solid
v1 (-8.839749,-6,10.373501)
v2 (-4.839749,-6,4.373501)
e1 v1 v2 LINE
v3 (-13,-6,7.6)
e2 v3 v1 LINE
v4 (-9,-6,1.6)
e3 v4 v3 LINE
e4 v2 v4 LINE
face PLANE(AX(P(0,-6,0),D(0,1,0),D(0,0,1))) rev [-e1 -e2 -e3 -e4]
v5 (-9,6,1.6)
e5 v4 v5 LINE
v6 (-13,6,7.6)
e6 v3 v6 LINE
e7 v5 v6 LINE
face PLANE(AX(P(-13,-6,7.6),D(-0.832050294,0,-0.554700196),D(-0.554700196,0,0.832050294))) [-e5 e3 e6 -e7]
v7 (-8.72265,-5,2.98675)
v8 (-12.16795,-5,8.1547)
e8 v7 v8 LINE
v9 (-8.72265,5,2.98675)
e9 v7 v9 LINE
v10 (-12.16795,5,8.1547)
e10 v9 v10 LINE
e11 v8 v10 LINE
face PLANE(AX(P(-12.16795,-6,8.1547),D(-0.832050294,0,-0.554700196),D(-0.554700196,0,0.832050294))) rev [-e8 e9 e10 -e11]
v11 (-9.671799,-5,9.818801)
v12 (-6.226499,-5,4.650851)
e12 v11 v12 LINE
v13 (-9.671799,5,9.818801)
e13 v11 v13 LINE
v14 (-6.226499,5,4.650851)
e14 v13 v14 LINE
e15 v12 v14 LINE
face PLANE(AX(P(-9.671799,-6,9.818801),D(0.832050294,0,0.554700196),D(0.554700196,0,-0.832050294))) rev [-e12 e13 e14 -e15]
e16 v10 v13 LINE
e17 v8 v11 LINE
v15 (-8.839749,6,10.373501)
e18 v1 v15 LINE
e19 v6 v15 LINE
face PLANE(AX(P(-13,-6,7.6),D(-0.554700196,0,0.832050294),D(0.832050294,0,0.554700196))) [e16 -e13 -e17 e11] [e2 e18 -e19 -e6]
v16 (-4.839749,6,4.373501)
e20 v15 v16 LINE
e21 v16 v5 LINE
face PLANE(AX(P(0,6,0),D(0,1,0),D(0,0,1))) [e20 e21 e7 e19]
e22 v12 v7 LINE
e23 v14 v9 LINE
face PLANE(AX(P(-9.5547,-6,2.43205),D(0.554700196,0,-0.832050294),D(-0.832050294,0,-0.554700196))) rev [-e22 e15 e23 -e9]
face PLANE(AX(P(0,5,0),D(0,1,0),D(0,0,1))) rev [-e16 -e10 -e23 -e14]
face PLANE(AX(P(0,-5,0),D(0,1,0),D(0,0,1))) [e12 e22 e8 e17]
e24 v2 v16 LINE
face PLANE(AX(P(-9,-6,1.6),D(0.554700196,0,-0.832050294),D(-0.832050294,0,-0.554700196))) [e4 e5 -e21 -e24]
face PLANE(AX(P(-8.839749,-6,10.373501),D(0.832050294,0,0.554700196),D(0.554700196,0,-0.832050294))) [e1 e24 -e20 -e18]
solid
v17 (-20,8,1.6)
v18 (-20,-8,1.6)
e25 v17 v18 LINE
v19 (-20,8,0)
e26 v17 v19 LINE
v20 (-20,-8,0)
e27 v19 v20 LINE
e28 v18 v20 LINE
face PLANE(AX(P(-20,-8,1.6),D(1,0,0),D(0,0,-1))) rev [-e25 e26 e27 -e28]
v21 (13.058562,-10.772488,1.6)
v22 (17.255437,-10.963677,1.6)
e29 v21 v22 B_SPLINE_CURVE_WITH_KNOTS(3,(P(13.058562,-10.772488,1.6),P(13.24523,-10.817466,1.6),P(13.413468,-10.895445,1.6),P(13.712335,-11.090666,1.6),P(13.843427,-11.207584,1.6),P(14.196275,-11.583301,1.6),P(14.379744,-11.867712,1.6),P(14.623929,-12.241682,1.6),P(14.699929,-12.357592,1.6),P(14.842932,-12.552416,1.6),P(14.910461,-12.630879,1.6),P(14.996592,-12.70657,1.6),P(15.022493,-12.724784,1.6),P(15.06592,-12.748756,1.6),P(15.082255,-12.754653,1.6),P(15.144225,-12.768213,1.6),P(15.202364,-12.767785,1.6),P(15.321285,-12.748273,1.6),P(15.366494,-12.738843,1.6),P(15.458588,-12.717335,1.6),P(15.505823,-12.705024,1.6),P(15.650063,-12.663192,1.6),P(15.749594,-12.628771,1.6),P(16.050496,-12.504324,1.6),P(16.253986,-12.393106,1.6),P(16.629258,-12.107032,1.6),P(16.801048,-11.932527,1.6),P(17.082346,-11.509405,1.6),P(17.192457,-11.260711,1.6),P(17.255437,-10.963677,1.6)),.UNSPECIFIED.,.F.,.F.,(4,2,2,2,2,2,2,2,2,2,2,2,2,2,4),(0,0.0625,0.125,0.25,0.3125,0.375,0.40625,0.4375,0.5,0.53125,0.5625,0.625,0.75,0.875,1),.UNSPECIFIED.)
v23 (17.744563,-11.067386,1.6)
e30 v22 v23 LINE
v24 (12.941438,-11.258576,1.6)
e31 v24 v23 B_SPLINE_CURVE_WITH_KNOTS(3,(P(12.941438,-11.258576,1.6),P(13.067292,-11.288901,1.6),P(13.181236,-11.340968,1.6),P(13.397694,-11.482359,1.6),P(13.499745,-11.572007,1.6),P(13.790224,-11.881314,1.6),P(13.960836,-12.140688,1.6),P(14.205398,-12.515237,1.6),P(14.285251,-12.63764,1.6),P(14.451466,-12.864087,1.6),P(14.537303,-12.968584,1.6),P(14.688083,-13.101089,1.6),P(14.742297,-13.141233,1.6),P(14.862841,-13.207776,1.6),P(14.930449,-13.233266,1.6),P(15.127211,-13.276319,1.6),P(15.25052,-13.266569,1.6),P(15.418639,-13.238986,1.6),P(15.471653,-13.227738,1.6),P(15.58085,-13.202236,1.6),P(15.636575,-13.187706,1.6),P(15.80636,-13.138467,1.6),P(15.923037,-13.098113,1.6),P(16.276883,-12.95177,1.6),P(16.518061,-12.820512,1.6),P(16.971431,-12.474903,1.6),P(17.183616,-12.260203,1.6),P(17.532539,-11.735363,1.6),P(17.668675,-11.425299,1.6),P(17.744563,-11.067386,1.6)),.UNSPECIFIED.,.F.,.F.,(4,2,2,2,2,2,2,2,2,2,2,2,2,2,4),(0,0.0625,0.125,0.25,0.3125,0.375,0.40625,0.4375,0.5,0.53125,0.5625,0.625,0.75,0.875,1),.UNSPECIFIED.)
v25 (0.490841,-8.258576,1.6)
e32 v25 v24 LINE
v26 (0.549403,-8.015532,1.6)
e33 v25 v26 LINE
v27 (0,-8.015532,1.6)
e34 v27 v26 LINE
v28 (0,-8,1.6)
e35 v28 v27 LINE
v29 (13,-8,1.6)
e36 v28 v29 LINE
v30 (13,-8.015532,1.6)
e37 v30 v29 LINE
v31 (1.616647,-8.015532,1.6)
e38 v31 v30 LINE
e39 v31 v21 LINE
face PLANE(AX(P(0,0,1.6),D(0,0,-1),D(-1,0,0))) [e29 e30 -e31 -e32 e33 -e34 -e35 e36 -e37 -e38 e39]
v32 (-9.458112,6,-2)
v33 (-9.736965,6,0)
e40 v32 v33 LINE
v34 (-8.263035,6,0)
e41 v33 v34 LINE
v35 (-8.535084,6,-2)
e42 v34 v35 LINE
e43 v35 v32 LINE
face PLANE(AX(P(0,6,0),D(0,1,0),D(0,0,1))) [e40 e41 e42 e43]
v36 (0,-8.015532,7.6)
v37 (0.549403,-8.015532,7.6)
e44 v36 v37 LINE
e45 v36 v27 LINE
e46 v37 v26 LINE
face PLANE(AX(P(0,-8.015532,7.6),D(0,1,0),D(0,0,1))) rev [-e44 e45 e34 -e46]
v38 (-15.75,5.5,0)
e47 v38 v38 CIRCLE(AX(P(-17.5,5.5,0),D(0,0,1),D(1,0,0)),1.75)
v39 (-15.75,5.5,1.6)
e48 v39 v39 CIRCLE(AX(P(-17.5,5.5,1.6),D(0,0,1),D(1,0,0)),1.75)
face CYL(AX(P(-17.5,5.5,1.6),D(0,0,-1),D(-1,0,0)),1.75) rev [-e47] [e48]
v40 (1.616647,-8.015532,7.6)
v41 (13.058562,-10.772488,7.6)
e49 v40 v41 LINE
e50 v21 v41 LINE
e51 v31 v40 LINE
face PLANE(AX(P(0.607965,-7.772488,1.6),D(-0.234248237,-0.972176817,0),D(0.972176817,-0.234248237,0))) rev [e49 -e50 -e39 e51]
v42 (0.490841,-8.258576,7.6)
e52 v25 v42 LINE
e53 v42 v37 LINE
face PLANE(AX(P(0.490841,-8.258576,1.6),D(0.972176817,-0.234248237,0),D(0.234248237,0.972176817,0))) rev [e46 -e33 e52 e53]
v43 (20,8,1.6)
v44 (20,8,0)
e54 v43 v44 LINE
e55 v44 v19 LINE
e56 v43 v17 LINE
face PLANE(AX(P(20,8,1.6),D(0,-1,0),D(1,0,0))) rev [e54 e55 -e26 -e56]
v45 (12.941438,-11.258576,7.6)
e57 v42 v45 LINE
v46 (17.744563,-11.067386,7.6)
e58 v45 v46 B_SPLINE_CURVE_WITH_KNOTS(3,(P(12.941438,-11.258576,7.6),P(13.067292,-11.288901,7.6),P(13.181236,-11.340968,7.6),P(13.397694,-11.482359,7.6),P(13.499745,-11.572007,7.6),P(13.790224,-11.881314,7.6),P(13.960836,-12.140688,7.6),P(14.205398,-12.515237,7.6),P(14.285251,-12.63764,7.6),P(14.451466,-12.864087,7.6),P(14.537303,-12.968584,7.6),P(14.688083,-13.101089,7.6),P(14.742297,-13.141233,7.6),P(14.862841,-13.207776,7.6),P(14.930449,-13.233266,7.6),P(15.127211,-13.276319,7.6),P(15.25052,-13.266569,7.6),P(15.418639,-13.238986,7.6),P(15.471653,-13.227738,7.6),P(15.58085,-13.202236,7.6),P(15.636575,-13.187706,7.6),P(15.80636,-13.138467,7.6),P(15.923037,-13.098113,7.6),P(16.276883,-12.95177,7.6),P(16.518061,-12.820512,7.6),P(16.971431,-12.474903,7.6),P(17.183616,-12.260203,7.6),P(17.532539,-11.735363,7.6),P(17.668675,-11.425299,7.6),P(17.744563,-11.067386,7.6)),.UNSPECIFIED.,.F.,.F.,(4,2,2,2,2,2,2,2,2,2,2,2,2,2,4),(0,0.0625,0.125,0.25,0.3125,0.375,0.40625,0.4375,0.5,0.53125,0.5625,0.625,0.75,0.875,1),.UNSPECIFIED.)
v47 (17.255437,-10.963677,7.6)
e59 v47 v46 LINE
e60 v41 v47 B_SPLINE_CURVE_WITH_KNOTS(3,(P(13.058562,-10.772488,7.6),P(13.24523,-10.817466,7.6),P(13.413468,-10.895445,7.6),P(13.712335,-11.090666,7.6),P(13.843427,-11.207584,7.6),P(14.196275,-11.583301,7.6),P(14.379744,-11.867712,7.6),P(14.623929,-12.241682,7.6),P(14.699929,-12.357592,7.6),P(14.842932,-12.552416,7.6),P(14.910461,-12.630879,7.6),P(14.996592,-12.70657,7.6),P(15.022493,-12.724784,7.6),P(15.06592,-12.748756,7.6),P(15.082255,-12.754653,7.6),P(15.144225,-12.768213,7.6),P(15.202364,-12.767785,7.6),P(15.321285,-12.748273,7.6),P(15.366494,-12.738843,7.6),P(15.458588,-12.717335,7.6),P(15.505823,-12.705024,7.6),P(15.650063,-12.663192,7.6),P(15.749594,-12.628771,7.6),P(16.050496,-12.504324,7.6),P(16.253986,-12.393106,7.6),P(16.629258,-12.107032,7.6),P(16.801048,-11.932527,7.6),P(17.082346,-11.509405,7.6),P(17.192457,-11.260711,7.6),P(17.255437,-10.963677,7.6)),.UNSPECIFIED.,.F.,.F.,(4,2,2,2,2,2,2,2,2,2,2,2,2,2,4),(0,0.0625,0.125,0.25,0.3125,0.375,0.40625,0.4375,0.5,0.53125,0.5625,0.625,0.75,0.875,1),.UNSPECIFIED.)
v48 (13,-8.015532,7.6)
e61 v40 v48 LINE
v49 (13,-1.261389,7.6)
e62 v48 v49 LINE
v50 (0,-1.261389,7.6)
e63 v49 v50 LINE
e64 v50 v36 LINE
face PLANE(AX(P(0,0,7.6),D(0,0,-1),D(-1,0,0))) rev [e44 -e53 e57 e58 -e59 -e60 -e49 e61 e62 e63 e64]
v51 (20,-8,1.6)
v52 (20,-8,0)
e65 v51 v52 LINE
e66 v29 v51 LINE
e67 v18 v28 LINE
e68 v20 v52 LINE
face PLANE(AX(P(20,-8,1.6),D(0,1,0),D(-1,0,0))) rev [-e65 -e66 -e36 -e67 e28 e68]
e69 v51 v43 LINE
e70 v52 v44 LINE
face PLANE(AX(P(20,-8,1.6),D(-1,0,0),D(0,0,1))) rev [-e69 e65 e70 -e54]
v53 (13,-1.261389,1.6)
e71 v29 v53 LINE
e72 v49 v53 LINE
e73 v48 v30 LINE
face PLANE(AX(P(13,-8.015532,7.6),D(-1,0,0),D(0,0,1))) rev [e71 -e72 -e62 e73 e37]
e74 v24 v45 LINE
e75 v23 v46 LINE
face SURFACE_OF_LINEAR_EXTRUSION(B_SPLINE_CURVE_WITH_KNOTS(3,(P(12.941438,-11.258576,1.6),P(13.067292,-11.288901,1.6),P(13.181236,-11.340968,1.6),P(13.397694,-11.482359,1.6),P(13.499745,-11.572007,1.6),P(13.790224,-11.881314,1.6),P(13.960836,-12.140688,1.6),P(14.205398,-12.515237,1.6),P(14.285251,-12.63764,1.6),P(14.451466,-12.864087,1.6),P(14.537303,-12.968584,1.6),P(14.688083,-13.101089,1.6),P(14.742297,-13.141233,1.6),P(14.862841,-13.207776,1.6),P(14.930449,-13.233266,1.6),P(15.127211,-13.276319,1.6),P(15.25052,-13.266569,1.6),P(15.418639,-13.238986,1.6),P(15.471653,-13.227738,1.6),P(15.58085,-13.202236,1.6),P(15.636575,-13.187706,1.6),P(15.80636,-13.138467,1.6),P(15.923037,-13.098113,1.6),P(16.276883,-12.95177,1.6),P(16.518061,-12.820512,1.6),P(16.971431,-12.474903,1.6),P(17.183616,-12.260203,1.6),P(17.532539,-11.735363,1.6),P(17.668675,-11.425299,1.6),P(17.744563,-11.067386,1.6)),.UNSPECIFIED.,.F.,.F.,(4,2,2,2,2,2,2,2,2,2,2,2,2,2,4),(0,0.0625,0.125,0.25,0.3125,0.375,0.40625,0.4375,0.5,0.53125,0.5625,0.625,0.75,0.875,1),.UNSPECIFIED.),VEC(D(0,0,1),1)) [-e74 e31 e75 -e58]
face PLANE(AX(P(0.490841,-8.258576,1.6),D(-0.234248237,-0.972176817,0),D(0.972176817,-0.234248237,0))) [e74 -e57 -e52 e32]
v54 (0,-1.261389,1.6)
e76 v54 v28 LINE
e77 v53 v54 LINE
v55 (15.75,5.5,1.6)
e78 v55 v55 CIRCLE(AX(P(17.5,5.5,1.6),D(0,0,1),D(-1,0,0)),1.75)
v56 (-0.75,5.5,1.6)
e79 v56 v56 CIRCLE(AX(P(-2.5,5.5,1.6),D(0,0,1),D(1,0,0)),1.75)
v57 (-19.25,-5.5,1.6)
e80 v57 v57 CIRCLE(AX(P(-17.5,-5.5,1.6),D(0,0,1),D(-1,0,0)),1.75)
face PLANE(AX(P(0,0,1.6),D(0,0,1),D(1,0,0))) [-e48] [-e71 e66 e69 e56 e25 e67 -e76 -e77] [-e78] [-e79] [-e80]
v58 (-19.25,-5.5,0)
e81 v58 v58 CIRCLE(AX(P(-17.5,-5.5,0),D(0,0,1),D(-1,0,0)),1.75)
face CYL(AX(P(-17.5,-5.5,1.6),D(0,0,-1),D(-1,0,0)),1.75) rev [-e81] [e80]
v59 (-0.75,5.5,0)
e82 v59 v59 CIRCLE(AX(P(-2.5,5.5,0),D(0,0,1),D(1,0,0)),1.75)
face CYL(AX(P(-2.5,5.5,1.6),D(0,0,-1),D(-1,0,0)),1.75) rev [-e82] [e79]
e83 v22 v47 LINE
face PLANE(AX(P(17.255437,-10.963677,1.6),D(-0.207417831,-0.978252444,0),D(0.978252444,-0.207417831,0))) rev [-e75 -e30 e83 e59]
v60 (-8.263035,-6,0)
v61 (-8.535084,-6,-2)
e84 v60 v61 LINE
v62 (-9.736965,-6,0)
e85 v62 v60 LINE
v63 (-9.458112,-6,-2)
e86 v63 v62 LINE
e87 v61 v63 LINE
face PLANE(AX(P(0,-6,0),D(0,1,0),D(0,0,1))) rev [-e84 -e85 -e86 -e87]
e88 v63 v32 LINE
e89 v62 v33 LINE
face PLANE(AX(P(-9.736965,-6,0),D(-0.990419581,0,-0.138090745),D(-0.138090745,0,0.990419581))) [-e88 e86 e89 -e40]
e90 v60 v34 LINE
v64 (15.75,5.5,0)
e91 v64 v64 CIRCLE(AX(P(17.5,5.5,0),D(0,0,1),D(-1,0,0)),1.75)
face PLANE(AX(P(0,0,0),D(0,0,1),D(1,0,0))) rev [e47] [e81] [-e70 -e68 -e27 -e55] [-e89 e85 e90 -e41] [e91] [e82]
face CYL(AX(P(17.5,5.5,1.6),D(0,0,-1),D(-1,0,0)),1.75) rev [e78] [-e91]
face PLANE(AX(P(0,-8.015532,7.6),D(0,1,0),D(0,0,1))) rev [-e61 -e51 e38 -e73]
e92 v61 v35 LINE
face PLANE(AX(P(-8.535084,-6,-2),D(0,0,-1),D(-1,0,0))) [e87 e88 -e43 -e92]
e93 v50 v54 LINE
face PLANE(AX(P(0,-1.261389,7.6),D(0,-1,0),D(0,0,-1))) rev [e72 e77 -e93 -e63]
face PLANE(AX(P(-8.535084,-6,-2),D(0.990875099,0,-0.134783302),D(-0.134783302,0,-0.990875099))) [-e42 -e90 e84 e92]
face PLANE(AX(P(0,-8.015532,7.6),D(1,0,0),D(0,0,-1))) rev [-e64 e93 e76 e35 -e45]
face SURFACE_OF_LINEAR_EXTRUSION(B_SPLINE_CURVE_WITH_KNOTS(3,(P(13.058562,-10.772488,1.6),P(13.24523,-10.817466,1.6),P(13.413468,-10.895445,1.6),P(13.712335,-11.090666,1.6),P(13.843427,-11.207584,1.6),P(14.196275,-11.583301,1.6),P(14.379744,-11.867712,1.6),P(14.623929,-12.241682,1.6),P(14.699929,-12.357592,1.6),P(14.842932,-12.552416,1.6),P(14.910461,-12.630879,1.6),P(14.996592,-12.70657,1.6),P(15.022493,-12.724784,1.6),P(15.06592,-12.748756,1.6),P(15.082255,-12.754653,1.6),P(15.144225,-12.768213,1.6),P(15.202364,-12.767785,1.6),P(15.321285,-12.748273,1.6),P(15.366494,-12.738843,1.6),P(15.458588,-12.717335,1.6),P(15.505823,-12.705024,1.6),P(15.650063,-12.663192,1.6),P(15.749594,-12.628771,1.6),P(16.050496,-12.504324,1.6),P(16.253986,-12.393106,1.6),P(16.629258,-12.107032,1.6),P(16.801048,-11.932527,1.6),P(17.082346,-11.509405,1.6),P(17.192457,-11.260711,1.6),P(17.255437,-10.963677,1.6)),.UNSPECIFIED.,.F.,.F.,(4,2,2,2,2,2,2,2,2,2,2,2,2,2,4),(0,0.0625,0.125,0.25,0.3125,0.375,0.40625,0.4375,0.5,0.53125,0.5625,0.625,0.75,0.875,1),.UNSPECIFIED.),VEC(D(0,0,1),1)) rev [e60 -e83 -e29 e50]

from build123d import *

# Parameters (mm, degrees)
SKETCH1_W           = 40
SKETCH1_H           = 16
SKETCH1_R           = 1.75
EXTRUDE1_DEPTH      = 1.6
SKETCH2_W           = 13
SKETCH2_H           = 6.754142386
EXTRUDE2_DEPTH      = 6
EXTRUDE_THIN1_START = -6
EXTRUDE_THIN1_DEPTH = 6
EXTRUDE3_DEPTH      = 6
EXTRUDE3_DEPTH_BACK = 6
SHELL1_T            = -1
EXTRUDE4_DEPTH      = 6
EXTRUDE4_DEPTH_BACK = 6


# Read off the part's stored shape, not the designer's step: Extrude-Thin1
with BuildPart() as part:
    # Sketch1 → Extrude1 (new body)
    with BuildSketch(Plane.XY):
        Rectangle(SKETCH1_W, SKETCH1_H)
        with Locations((-17.5, 5.5)):
            Circle(SKETCH1_R, mode=Mode.SUBTRACT)
        with Locations(Location((17.5, 5.5, 0), (0, 0, 180))):
            Circle(SKETCH1_R, mode=Mode.SUBTRACT)
        with Locations(Location((-17.5, -5.5, 0), (0, 0, 180))):
            Circle(SKETCH1_R, mode=Mode.SUBTRACT)
        with Locations((-2.5, 5.5)):
            Circle(SKETCH1_R, mode=Mode.SUBTRACT)
    extrude(amount=EXTRUDE1_DEPTH)

    # Sketch2 → Extrude2 (add)
    with BuildSketch(Plane.XY.offset(1.6)):
        with Locations((6.5, -4.638460583)):
            Rectangle(SKETCH2_W, SKETCH2_H)
    extrude(amount=EXTRUDE2_DEPTH)

    # Extrude-Thin1 outline → Extrude-Thin1 (add)
    with BuildSketch(Plane.XY.offset(7.6).offset(EXTRUDE_THIN1_START)):
        with BuildLine():
            Line((0.490840728, -8.25857598), (12.941437941, -11.25857598))
            add(Edge.make_bspline(
                [(12.941437941, -11.25857598), (13.067291507, -11.288900686), (13.181236211, -11.340967983), (13.397694142, -11.482359101), (13.49974484, -11.572007401), (13.790224047, -11.88131409), (13.96083617, -12.140688181), (14.20539816, -12.515236753), (14.285250733, -12.637639815), (14.451465801, -12.86408748), (14.537302747, -12.968584339), (14.688083246, -13.101089197), (14.742296743, -13.141233409), (14.862841146, -13.207776058), (14.930449466, -13.233266141), (15.127211291, -13.276318978), (15.250520499, -13.266569443), (15.418638539, -13.238985632), (15.471653276, -13.227738224), (15.58084969, -13.202236421), (15.636575352, -13.187706268), (15.806360125, -13.138466747), (15.923036621, -13.098113207), (16.276883006, -12.95177033), (16.518060705, -12.820511607), (16.971431108, -12.474902809), (17.183616041, -12.260202761), (17.532538565, -11.735362691), (17.66867522, -11.425299122), (17.744563111, -11.067386233)],
                knots=[0, 0, 0, 0, 0.0625, 0.0625, 0.125, 0.125, 0.25, 0.25, 0.3125, 0.3125, 0.375, 0.375, 0.40625, 0.40625, 0.4375, 0.4375, 0.5, 0.5, 0.53125, 0.53125, 0.5625, 0.5625, 0.625, 0.625, 0.75, 0.75, 0.875, 0.875, 1, 1, 1, 1], degree=3))
            Line((17.744563111, -11.067386233), (17.255436889, -10.963677318))
            add(Edge.make_bspline(
                [(13.058562059, -10.772487571), (13.245229843, -10.817465603), (13.41346766, -10.895444904), (13.712335202, -11.090666284), (13.843427458, -11.207583885), (14.196274895, -11.583301215), (14.379744249, -11.867711564), (14.62392859, -12.241681764), (14.699928814, -12.357591978), (14.842932135, -12.55241648), (14.910460781, -12.630878513), (14.996591837, -12.706569889), (15.022492719, -12.724784071), (15.065919556, -12.748756455), (15.082254893, -12.754653028), (15.144225267, -12.768212571), (15.202364037, -12.767785289), (15.321284852, -12.748273466), (15.366494295, -12.73884283), (15.458587584, -12.717335302), (15.505822811, -12.705023793), (15.650063368, -12.663192386), (15.74959397, -12.628770712), (16.050495881, -12.504324474), (16.253986383, -12.393105821), (16.629258319, -12.107032266), (16.801047526, -11.932527336), (17.082346492, -11.509404841), (17.192457189, -11.260710823), (17.255436889, -10.963677318)],
                knots=[0, 0, 0, 0, 0.0625, 0.0625, 0.125, 0.125, 0.25, 0.25, 0.3125, 0.3125, 0.375, 0.375, 0.40625, 0.40625, 0.4375, 0.4375, 0.5, 0.5, 0.53125, 0.53125, 0.5625, 0.5625, 0.625, 0.625, 0.75, 0.75, 0.875, 0.875, 1, 1, 1, 1], degree=3))
            Line((13.058562059, -10.772487571), (1.616646677, -8.015531776))
            Line((1.616646677, -8.015531776), (0.549402787, -8.015531776))
            Line((0.549402787, -8.015531776), (0.490840728, -8.25857598))
        make_face()
    extrude(amount=EXTRUDE_THIN1_DEPTH)

    # Sketch5 → Extrude4 (add, two sides: drawn at the far end of the back side and taken through both)
    with BuildSketch(Plane(origin=(0, 0, 0), x_dir=(1, 0, 0), z_dir=(0, 1, 0)).offset(-EXTRUDE4_DEPTH_BACK)):
        Polygon((-9.736964899, 0), (-9.458111879, 2), (-8.535084126, 2), (-8.263035101, 0), align=None)
    extrude(amount=EXTRUDE4_DEPTH + EXTRUDE4_DEPTH_BACK)


with BuildPart() as body_2:
    # Sketch4 → Extrude3 (new, two sides: drawn at the far end of the back side and taken through both)
    with BuildSketch(Plane(origin=(0, 0, 0), x_dir=(1, 0, 0), z_dir=(0, 1, 0)).offset(-EXTRUDE3_DEPTH_BACK)):
        Polygon((-13, -7.6), (-9, -1.6), (-4.839748528, -4.373500981), (-8.839748528, -10.373500981), align=None)
    extrude(amount=EXTRUDE3_DEPTH + EXTRUDE3_DEPTH_BACK)

    # Shell1
    shell1_openings = [body_2.faces().sort_by_distance(p)[0] for p in [
        (-10.919874264, 0, 8.986750491),
    ]]
    offset(amount=SHELL1_T, openings=shell1_openings, kind=Kind.INTERSECTION)


solid = Compound([part.part, body_2.part])
